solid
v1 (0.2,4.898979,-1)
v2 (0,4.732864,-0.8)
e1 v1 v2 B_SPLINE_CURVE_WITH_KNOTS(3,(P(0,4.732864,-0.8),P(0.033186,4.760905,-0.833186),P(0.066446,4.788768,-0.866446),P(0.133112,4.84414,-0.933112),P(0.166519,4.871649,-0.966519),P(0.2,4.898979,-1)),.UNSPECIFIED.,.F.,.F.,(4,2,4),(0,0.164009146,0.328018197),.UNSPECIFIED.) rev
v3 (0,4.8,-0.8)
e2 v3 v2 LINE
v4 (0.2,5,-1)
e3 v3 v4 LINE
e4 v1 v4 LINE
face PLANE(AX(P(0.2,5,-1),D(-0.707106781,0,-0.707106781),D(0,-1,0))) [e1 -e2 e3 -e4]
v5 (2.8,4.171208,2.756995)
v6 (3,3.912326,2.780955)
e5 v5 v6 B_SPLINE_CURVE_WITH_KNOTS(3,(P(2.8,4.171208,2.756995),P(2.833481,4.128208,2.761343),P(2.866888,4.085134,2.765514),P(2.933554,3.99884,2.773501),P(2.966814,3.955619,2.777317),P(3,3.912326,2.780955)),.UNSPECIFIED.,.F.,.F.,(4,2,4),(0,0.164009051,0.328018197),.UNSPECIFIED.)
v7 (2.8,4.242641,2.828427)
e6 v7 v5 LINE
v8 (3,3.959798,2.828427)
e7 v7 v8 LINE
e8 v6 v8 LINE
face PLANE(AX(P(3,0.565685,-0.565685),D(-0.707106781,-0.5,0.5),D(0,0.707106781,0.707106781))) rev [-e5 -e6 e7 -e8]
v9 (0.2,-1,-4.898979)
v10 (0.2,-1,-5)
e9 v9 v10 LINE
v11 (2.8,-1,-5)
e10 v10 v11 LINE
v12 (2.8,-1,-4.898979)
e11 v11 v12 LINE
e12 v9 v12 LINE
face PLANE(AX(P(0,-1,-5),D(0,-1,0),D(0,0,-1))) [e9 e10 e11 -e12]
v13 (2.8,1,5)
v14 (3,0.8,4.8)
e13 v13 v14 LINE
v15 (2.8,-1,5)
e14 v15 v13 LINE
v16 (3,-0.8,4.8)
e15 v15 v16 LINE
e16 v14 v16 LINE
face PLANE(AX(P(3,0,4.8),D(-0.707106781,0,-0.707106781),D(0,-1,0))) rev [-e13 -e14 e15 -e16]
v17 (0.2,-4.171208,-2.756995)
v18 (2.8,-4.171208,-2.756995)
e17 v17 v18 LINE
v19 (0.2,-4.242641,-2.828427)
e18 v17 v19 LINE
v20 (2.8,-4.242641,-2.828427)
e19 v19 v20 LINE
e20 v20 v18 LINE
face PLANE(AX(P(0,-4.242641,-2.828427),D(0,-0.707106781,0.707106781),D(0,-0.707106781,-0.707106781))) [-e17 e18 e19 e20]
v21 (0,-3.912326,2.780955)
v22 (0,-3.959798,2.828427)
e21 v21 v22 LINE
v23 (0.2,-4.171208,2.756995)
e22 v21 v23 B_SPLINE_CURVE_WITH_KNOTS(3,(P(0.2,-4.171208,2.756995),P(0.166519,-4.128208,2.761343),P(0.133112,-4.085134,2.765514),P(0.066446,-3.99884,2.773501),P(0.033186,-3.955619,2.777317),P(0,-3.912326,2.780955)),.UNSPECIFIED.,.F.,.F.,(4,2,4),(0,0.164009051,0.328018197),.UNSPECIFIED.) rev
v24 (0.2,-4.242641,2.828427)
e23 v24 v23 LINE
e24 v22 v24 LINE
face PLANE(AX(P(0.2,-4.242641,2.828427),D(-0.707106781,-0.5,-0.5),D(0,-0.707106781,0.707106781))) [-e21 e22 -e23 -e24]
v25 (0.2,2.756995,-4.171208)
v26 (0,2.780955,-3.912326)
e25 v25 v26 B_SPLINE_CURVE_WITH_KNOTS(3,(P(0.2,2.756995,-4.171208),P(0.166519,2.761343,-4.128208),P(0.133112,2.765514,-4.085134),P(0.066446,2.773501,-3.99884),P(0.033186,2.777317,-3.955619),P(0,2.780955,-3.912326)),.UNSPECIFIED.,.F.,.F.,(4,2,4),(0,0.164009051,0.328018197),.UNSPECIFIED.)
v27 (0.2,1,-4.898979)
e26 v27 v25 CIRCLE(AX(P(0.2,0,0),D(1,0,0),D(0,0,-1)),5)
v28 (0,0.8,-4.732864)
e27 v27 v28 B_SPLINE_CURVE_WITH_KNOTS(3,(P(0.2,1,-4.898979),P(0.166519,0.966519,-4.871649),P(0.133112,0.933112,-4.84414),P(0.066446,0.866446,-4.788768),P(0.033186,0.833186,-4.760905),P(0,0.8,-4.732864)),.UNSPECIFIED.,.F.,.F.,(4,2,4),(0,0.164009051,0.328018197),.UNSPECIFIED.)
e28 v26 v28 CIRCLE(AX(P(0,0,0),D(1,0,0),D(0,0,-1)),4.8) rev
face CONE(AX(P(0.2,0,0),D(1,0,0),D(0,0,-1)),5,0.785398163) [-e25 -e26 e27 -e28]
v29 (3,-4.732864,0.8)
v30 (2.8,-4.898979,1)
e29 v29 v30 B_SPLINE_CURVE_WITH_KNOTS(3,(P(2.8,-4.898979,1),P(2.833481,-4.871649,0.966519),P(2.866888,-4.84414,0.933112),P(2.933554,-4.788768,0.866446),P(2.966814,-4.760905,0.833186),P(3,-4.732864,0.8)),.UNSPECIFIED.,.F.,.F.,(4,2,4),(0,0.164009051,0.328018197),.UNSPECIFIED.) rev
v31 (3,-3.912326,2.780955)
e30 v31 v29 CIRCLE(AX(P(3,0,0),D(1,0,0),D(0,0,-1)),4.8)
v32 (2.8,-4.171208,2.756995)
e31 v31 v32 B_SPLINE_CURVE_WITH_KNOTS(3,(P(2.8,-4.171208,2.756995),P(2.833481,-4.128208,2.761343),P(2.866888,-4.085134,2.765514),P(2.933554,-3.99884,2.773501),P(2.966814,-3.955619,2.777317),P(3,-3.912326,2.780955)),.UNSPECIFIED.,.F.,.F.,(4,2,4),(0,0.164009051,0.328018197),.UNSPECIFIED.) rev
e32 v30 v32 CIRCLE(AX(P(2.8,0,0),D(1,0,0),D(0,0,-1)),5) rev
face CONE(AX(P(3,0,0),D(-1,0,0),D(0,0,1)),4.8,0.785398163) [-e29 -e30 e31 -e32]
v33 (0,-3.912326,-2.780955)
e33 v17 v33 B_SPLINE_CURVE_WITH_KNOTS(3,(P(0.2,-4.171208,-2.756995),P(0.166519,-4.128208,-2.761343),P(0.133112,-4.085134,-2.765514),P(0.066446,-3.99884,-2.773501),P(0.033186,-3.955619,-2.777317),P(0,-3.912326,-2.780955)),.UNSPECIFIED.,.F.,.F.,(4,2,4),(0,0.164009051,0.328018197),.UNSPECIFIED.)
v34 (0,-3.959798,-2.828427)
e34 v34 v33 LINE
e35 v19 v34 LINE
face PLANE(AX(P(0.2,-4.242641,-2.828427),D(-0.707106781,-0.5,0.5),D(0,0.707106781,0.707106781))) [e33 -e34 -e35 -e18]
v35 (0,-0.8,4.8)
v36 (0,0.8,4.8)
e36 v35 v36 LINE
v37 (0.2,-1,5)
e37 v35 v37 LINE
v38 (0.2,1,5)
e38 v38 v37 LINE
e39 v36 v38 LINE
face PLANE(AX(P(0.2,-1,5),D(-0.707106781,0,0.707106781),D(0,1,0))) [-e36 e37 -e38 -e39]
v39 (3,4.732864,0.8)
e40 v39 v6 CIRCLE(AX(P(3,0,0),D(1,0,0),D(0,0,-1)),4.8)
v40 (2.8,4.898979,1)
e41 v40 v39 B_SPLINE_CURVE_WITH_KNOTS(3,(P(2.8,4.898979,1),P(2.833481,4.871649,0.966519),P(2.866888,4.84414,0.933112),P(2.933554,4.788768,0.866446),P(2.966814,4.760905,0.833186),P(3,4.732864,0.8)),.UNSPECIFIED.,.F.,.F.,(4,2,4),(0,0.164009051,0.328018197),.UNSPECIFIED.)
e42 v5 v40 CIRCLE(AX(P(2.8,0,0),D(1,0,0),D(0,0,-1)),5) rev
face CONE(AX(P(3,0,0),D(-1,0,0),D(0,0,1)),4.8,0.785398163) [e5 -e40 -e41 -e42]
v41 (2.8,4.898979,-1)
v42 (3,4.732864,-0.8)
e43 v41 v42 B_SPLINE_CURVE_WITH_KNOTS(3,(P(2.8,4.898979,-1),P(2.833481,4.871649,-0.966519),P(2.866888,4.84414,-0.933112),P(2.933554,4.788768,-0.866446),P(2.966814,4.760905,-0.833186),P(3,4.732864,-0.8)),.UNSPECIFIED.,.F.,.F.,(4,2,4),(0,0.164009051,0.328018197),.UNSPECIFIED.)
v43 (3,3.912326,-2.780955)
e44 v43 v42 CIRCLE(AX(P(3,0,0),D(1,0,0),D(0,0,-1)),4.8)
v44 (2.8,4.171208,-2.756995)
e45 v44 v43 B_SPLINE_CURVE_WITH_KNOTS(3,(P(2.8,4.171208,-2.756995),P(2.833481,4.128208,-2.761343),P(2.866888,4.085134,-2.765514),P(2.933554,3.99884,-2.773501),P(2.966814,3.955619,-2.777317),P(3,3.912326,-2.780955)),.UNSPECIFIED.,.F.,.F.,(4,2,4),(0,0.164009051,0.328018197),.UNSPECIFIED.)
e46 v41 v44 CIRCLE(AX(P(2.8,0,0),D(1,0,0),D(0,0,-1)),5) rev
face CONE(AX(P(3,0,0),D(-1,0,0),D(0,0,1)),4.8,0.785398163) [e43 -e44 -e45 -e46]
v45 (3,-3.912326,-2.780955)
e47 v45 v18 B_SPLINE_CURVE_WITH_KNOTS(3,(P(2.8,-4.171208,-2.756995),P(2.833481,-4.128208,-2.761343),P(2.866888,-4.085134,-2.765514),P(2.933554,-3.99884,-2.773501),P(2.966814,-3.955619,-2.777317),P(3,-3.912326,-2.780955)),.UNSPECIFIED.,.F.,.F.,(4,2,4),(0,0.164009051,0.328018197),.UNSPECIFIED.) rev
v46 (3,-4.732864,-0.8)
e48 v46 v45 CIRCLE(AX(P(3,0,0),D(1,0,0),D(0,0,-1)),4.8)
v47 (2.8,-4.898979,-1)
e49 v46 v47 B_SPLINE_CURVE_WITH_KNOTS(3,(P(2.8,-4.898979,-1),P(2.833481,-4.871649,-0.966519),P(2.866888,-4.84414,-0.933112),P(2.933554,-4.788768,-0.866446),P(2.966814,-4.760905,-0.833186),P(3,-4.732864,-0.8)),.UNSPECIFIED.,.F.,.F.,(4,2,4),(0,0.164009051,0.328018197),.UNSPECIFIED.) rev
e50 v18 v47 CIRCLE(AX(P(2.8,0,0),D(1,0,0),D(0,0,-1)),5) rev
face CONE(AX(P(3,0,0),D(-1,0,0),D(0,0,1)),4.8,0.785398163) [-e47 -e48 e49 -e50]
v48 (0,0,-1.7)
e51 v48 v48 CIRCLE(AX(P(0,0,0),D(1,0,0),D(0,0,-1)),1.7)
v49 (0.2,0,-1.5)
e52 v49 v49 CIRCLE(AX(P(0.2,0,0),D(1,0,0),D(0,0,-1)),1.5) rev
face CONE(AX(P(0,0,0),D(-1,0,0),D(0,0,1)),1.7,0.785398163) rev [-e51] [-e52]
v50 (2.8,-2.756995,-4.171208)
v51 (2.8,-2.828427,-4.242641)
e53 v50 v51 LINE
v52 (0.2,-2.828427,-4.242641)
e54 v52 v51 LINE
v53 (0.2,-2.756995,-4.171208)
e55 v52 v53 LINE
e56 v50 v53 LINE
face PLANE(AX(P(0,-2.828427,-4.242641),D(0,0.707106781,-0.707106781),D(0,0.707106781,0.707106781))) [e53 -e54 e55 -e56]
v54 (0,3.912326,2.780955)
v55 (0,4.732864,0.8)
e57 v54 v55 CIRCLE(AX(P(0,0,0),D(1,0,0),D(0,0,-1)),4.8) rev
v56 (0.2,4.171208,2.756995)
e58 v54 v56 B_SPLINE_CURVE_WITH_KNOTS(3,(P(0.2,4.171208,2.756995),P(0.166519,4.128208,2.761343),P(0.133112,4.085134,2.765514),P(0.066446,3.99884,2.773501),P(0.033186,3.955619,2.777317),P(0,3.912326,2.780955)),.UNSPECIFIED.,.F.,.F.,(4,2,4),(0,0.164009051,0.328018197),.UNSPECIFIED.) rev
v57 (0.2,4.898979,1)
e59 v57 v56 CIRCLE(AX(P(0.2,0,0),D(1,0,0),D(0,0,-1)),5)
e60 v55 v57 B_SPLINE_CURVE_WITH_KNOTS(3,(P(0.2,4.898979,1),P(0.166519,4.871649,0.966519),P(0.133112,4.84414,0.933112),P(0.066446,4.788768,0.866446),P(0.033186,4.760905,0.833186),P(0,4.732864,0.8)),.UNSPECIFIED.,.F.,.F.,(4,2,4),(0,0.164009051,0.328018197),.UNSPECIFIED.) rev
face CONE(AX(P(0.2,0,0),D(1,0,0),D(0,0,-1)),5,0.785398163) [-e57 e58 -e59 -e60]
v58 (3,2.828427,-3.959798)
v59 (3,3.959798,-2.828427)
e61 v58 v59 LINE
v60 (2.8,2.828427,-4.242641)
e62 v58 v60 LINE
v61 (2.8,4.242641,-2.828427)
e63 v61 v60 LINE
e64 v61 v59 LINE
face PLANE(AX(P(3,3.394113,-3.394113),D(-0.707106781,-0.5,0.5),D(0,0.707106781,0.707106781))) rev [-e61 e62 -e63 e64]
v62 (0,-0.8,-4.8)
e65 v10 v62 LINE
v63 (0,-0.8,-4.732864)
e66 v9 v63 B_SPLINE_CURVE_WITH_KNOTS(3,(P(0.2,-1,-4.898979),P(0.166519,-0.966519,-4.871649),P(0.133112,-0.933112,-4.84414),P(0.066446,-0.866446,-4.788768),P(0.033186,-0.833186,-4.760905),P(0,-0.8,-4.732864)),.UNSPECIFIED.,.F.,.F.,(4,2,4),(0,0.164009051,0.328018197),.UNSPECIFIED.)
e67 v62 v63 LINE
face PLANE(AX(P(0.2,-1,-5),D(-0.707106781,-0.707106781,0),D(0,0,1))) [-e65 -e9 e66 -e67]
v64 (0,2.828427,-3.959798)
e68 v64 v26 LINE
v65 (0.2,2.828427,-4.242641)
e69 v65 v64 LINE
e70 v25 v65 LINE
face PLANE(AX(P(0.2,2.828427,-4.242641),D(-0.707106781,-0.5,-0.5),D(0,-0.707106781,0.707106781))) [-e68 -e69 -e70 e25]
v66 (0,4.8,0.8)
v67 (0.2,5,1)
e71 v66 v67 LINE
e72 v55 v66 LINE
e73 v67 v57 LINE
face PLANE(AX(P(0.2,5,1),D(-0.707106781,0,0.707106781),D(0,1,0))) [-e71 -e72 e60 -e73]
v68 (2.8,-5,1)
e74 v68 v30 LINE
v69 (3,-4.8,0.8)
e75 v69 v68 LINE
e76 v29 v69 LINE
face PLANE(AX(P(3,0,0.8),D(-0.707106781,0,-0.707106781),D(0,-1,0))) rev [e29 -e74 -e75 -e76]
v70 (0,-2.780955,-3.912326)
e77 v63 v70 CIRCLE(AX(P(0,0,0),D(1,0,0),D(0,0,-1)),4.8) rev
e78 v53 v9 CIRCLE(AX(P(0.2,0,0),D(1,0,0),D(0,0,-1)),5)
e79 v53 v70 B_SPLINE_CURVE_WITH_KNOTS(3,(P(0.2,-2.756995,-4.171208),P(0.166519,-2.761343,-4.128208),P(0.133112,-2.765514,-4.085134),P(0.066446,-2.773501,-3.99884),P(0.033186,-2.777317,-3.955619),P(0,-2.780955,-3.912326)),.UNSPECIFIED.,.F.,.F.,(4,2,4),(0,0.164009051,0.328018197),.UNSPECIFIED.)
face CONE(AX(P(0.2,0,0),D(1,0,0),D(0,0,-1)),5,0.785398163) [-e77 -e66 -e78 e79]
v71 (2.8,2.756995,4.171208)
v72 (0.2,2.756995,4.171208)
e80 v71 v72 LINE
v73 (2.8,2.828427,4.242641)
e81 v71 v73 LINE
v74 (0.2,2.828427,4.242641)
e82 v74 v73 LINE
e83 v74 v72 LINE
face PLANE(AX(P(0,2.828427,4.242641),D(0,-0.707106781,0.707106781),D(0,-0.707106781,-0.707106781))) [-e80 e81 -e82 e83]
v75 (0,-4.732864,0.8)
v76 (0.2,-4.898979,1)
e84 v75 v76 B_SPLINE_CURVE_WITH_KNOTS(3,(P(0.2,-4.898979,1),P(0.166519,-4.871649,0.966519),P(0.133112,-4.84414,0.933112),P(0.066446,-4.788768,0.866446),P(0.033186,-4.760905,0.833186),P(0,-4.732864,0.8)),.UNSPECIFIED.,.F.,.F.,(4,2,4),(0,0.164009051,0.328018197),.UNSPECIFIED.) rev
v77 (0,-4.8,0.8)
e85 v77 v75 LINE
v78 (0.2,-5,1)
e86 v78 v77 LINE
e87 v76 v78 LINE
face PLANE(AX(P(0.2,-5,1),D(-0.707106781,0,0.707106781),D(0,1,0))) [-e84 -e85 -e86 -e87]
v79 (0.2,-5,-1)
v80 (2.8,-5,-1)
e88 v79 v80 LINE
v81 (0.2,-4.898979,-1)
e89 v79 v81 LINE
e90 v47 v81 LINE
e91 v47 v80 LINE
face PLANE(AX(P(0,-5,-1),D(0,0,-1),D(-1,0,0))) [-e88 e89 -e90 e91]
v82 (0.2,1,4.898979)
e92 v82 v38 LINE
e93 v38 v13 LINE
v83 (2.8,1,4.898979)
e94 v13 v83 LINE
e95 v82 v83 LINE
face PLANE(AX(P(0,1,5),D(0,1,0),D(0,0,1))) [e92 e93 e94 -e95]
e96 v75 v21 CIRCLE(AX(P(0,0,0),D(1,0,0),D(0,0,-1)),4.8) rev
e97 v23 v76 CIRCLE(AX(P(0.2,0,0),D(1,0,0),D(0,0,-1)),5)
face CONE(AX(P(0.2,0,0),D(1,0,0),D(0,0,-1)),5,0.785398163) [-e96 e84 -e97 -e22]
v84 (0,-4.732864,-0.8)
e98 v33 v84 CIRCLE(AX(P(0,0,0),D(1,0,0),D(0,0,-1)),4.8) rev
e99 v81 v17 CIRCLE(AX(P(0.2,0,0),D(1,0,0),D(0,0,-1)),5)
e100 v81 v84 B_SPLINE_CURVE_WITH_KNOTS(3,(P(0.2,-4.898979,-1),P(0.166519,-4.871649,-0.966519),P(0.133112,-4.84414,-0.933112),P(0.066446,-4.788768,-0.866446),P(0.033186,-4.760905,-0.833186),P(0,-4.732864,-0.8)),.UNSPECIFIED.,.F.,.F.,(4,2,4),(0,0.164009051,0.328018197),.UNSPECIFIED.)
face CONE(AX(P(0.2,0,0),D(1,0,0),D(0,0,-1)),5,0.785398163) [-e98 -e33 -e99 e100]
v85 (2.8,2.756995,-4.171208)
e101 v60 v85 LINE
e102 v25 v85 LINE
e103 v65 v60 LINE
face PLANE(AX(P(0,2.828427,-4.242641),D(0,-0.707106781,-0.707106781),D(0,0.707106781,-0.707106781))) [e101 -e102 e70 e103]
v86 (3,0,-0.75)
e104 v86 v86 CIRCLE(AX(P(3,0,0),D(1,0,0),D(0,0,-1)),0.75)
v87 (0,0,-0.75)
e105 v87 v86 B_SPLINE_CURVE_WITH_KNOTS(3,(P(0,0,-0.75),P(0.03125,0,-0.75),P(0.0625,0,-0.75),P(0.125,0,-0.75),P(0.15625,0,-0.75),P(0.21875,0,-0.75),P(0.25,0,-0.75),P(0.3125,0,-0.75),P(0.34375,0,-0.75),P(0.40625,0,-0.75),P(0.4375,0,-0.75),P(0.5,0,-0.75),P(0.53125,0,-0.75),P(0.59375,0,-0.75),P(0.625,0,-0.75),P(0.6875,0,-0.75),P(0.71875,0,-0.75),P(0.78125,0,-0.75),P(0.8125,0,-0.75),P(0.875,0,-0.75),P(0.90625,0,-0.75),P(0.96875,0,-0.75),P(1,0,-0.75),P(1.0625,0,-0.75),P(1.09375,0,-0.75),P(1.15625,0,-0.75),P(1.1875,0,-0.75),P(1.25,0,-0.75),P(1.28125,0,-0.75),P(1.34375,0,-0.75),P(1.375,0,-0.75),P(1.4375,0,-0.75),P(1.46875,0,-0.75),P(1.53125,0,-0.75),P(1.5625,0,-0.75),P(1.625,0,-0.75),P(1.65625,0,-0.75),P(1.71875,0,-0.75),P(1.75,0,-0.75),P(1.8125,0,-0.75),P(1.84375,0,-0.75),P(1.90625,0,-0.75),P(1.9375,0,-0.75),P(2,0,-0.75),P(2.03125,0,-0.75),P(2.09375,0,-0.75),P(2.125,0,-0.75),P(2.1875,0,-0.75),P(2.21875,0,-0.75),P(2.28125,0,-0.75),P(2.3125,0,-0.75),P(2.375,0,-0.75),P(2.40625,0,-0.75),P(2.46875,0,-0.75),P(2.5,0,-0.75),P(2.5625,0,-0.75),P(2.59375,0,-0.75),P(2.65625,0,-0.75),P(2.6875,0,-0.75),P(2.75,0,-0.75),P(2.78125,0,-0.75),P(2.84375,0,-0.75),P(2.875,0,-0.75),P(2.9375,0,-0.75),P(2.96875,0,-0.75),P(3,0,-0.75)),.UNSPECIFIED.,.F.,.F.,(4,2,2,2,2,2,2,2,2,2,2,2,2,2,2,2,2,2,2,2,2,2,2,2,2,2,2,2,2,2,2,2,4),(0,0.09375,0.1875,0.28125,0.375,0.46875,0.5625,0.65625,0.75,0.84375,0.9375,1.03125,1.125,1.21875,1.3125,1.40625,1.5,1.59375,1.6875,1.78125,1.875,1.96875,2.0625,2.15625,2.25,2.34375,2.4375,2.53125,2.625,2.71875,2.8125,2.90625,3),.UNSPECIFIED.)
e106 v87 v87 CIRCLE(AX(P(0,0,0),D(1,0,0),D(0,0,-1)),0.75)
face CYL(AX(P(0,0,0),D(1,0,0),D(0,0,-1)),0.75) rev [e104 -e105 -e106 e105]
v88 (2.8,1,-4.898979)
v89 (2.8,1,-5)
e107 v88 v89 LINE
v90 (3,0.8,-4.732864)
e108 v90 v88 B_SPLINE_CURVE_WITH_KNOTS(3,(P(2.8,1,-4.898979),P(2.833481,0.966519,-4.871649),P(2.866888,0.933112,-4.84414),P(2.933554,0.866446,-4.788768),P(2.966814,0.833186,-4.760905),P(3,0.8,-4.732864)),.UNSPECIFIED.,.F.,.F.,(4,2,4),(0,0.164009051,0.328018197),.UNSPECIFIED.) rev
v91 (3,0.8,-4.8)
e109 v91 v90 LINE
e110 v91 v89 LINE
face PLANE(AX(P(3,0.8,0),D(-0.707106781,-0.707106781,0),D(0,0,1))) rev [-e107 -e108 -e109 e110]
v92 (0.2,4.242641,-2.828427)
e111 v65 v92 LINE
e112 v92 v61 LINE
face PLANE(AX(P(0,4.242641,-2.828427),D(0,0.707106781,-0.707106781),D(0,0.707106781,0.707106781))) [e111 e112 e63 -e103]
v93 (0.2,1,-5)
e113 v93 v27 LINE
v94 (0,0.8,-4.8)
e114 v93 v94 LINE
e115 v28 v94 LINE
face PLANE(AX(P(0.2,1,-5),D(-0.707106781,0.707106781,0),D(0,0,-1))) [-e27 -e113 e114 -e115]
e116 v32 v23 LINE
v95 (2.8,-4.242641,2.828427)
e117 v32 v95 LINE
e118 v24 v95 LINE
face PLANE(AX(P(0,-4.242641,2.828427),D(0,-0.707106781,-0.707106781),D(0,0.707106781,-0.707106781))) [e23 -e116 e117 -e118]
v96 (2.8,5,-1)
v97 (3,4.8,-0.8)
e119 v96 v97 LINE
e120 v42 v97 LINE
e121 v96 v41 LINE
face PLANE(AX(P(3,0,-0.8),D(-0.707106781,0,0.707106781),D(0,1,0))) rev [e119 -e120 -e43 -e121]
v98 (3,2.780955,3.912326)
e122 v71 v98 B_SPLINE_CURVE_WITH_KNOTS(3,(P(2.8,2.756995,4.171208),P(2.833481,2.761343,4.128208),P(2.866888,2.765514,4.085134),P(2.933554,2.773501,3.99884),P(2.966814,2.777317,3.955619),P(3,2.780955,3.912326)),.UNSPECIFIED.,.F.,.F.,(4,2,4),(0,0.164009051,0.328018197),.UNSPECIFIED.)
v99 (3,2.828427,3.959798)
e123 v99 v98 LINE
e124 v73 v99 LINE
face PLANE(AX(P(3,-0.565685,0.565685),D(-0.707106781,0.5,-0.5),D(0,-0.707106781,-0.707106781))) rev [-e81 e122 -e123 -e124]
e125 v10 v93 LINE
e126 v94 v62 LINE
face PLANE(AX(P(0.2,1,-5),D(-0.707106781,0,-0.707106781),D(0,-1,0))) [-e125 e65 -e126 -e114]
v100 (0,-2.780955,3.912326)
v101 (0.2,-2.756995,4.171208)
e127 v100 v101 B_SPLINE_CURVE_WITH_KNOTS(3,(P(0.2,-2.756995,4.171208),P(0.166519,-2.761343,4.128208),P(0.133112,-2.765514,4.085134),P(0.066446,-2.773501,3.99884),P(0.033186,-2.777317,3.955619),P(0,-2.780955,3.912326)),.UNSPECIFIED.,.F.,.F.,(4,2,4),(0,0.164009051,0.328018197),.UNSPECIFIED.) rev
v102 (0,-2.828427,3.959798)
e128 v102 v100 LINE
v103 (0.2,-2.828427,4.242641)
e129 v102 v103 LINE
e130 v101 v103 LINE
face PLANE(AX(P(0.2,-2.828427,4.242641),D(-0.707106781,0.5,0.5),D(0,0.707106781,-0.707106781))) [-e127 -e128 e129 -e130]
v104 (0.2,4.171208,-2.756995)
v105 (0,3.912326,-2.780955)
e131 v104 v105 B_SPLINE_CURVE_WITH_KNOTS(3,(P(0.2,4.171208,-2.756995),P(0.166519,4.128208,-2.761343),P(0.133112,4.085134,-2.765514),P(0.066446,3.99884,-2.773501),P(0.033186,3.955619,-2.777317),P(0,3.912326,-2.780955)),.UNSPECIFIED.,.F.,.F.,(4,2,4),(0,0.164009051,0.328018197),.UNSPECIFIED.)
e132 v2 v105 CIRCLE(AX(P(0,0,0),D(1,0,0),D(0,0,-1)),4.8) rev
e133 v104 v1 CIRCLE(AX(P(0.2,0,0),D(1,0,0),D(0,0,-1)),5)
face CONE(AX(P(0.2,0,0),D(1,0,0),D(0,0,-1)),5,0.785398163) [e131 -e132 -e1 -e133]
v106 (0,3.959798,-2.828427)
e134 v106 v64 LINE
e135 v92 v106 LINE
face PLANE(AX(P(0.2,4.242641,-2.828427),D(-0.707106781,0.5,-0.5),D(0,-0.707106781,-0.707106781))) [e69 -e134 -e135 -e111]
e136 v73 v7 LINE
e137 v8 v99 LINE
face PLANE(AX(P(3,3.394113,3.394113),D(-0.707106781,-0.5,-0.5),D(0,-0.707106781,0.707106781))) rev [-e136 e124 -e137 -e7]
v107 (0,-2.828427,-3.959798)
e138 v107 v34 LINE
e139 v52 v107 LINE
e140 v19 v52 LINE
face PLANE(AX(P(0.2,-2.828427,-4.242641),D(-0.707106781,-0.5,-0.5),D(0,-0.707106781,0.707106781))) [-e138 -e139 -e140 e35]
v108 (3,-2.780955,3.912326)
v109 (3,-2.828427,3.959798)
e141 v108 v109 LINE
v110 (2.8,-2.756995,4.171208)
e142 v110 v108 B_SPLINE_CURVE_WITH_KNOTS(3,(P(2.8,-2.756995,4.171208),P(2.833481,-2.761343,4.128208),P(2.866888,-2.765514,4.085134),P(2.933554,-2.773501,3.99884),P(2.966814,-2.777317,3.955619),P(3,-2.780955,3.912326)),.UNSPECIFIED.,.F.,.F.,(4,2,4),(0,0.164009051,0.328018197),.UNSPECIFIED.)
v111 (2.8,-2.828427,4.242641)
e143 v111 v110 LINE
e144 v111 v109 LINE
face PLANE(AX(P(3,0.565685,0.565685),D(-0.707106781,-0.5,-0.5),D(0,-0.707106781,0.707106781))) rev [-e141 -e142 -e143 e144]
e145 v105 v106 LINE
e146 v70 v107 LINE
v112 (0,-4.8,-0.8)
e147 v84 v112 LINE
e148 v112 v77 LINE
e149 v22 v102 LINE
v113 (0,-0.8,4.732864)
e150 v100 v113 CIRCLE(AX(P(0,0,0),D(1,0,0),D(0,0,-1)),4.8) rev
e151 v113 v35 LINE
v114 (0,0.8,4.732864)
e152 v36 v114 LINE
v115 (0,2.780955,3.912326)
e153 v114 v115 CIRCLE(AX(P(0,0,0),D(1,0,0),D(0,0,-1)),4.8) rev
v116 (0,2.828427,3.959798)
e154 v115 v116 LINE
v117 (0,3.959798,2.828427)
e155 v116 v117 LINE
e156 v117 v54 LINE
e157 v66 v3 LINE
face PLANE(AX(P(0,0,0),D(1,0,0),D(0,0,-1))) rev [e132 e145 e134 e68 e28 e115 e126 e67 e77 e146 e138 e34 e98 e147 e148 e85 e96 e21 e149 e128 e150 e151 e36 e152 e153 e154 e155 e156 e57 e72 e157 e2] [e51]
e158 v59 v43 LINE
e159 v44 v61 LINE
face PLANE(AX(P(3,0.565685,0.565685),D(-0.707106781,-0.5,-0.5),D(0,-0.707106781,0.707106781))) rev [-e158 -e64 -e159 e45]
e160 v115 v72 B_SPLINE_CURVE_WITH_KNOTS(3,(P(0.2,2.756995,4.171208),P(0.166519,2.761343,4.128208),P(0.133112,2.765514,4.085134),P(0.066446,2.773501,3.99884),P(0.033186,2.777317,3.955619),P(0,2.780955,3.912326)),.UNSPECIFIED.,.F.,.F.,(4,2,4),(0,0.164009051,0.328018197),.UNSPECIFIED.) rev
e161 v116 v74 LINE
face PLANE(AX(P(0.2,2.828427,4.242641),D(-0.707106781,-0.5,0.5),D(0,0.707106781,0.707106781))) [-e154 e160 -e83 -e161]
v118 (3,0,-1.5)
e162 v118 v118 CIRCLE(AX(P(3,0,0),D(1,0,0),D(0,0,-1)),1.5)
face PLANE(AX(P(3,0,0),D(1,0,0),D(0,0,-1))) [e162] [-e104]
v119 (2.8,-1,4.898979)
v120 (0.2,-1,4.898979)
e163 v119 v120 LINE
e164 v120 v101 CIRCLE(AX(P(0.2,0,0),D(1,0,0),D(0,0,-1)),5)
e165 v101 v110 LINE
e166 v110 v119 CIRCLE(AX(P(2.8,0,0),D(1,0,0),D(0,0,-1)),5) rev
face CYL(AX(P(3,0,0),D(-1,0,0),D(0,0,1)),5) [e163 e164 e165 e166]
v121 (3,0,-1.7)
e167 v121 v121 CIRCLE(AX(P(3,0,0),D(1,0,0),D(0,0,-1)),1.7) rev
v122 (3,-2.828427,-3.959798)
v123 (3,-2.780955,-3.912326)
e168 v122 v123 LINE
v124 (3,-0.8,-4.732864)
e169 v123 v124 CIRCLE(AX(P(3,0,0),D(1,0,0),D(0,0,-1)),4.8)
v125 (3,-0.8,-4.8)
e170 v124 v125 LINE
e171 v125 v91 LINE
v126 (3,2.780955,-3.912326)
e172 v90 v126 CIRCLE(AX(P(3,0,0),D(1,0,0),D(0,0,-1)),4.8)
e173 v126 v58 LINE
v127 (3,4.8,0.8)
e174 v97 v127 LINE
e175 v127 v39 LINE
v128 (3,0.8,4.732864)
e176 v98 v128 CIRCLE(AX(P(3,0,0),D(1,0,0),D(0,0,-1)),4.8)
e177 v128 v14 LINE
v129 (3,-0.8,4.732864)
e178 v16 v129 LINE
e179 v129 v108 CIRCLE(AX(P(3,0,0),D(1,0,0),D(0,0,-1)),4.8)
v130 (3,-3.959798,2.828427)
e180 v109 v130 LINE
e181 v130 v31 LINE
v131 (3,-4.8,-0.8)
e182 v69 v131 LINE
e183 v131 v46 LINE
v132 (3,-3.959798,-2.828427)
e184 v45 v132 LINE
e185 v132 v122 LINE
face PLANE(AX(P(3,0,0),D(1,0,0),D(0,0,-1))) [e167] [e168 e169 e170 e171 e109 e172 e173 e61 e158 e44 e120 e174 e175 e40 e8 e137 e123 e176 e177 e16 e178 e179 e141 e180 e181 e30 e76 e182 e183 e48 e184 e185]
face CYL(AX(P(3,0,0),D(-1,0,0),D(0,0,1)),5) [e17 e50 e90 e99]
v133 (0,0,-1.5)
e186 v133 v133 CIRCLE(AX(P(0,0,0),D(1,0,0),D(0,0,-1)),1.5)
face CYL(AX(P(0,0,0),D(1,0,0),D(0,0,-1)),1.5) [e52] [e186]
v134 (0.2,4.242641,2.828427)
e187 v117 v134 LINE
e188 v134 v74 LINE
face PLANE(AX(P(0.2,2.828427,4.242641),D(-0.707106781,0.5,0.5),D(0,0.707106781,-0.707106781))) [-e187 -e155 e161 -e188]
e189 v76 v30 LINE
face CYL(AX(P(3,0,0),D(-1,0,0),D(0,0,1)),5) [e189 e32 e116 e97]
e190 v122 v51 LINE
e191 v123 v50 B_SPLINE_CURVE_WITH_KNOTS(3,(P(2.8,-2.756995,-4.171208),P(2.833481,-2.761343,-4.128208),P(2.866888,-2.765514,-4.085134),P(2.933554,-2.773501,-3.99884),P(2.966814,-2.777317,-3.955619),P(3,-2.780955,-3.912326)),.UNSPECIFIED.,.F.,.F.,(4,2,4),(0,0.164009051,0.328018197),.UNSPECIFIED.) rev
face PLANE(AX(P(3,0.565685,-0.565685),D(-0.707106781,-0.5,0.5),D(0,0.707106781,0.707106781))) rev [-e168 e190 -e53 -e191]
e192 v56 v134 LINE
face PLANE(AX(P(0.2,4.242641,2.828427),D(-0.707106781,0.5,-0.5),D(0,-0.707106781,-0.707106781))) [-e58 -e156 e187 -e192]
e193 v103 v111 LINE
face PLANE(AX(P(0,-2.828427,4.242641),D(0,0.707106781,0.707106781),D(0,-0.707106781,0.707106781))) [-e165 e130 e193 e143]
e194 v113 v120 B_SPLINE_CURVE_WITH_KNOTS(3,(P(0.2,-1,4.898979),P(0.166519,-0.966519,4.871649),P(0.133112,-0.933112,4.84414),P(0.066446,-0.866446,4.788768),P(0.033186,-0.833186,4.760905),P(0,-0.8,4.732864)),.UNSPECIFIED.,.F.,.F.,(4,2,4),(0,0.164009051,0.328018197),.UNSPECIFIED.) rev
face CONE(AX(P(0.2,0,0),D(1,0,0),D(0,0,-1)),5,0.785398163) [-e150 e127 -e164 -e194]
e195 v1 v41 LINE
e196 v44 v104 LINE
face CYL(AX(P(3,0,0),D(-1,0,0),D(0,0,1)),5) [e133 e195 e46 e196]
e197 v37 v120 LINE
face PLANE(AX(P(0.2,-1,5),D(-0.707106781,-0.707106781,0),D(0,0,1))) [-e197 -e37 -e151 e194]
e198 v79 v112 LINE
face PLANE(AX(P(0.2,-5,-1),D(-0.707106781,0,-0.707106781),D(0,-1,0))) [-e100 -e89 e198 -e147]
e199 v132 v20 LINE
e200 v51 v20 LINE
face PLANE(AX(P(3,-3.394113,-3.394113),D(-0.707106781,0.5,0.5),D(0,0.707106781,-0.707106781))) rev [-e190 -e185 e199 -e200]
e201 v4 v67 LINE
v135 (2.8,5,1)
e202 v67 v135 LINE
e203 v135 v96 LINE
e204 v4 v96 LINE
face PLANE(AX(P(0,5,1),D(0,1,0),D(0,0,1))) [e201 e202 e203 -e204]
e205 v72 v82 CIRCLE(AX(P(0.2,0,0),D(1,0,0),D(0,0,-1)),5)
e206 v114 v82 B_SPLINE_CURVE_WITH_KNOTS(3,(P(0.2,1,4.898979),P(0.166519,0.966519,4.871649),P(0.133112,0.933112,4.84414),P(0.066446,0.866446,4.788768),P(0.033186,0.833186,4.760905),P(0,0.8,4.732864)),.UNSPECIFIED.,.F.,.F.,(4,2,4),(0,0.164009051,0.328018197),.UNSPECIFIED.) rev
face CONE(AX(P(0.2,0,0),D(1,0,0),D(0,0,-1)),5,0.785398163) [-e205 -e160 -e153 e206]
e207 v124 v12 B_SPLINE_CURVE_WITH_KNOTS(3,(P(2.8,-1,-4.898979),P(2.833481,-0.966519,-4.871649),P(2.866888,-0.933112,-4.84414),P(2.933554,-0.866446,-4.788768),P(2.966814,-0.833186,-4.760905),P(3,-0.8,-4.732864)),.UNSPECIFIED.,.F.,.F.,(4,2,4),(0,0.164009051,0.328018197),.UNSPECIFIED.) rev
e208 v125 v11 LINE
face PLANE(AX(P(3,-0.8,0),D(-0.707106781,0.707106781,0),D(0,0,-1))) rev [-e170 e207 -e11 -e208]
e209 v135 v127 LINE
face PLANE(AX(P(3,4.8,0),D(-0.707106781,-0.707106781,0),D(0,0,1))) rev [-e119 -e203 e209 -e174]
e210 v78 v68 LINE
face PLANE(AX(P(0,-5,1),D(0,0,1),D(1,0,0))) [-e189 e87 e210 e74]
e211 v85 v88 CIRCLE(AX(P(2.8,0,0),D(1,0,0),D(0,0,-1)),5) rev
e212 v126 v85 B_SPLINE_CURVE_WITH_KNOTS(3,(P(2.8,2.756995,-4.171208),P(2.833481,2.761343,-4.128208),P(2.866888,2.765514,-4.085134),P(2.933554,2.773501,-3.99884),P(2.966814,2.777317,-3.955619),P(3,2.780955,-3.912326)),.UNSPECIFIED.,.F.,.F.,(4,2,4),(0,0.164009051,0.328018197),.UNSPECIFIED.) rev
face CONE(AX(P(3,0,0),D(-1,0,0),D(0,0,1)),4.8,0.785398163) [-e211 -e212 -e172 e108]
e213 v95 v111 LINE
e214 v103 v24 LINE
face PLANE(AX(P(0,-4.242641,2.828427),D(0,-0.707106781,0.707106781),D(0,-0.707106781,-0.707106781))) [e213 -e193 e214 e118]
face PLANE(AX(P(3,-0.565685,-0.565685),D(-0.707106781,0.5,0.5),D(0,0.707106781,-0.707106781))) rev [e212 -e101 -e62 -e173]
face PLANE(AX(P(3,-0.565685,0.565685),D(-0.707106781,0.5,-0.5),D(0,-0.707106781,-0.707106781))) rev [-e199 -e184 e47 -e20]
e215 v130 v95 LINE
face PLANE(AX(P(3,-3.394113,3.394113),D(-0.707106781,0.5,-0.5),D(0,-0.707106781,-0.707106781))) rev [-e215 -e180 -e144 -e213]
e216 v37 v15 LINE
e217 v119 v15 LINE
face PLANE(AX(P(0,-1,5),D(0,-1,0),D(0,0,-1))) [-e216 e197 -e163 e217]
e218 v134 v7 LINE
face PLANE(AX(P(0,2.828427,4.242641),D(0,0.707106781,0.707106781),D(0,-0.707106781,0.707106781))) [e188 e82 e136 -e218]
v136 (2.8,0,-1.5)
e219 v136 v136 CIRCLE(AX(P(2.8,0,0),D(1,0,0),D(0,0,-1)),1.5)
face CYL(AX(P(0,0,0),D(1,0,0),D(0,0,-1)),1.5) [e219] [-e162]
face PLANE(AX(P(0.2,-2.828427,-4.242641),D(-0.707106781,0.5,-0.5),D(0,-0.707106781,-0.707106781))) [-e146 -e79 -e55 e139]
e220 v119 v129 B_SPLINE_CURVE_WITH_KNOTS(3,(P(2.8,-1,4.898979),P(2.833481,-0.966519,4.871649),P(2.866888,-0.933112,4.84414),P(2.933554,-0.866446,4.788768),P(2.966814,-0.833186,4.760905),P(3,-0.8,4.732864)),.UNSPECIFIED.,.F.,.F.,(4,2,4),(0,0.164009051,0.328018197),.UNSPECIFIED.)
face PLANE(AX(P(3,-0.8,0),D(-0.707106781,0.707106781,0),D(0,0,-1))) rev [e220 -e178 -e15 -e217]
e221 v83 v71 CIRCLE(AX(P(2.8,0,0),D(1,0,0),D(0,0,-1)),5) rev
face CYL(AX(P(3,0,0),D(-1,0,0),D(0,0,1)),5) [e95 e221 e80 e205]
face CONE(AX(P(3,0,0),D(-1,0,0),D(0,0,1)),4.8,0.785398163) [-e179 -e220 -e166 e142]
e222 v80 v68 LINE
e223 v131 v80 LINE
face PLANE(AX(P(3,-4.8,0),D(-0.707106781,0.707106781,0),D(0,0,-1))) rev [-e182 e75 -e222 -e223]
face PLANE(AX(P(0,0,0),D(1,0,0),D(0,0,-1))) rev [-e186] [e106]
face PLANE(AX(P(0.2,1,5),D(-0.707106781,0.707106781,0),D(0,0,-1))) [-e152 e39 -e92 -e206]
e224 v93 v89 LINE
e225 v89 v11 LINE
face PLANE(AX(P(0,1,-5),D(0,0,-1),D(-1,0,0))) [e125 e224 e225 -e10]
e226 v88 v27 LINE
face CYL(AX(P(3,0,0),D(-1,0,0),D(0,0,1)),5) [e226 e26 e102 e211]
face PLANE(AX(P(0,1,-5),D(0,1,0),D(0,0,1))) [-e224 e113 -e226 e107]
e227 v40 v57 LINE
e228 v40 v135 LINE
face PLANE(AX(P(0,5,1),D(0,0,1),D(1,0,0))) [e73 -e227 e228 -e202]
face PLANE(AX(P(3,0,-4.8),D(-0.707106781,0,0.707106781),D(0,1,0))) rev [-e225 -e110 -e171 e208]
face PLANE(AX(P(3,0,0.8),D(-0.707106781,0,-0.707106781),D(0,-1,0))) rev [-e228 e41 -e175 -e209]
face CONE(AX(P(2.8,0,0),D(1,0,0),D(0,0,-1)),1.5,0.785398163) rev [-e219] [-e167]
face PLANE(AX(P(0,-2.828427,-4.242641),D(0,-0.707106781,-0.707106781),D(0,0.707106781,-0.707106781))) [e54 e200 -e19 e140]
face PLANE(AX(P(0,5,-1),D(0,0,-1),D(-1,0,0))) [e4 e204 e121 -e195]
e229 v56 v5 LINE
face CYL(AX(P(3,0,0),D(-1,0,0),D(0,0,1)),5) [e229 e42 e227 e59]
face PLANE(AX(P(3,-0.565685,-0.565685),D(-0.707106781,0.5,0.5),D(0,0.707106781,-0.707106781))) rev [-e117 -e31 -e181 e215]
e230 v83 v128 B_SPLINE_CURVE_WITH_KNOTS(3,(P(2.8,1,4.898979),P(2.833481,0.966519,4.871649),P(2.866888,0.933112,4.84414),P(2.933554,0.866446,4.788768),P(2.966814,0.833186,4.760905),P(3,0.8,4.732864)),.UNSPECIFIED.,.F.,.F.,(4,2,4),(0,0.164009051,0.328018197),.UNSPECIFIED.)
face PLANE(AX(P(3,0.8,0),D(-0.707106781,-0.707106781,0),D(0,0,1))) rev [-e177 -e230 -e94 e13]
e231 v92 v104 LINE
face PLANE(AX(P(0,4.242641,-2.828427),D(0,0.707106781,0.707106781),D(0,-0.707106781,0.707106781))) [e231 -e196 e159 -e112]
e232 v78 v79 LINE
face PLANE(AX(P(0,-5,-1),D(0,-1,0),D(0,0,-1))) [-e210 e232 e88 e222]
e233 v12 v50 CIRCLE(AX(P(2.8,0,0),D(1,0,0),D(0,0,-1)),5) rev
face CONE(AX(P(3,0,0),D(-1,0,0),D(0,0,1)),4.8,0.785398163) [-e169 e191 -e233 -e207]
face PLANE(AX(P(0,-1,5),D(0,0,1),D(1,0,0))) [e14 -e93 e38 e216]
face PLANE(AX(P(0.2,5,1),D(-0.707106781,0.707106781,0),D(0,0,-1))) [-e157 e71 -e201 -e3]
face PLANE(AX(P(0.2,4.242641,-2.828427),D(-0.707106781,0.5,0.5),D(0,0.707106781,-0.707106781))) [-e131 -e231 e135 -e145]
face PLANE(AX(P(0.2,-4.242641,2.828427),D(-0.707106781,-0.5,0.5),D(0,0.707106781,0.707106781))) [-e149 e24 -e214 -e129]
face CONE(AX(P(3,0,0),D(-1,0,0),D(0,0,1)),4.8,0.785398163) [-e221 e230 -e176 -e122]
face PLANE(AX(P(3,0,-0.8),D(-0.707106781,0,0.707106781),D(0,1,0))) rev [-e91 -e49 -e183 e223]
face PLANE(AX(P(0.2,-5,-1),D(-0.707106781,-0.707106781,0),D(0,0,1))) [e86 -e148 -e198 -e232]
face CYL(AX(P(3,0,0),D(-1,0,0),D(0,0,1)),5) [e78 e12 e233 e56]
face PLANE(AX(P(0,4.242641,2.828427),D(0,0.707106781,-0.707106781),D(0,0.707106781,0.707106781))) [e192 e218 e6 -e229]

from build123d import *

# Parameters (mm, degrees)
SKETCH1_R                 = 5
SKETCH1_R_2               = 1.5
BOSS_EXTRUDE1_DEPTH       = 3
SKETCH2_W                 = 0.580440463
SKETCH2_H                 = 2
SKETCH2_W_2               = 2
SKETCH2_H_2               = 0.580440463
BOSS_EXTRUDE2_DEPTH       = 3
CHAMFER3_SIZE             = 0.2
CHAMFER4_SIZE             = 0.2
BOSS_EXTRUDE3_OUTLINE_R   = 1.5
BOSS_EXTRUDE3_OUTLINE_R_2 = 0.75
BOSS_EXTRUDE3_DEPTH       = 3


# Read off the part's stored shape, not the designer's step: Boss-Extrude3
with BuildPart() as part:
    # Sketch1 → Boss-Extrude1 (new body)
    with BuildSketch(Plane(origin=(0, 0, 0), x_dir=(0, 0, -1), z_dir=(1, 0, 0))):
        Circle(SKETCH1_R)
        Circle(SKETCH1_R_2, mode=Mode.SUBTRACT)
    extrude(amount=BOSS_EXTRUDE1_DEPTH)

    # Sketch2 → Boss-Extrude2 (add)
    with BuildSketch(Plane(origin=(3, 0, 0), x_dir=(0, 0, -1), z_dir=(1, 0, 0))):
        with Locations((4.709779769, 0)):
            Rectangle(SKETCH2_W, SKETCH2_H)
        Polygon((4.242640687, -2.828427125), (2.828427125, -4.242640687), (2.417993737, -3.8322073), (3.8322073, -2.417993737), align=None)
        with Locations((0, -4.709779769)):
            Rectangle(SKETCH2_W_2, SKETCH2_H_2)
        Polygon((-2.828427125, -4.242640687), (-4.242640687, -2.828427125), (-3.8322073, -2.417993737), (-2.417993737, -3.8322073), align=None)
        with Locations((-4.709779769, 0)):
            Rectangle(SKETCH2_W, SKETCH2_H)
        Polygon((-4.242640687, 2.828427125), (-2.828427125, 4.242640687), (-2.417993737, 3.8322073), (-3.8322073, 2.417993737), align=None)
        with Locations((0, 4.709779769)):
            Rectangle(SKETCH2_W_2, SKETCH2_H_2)
        Polygon((2.828427125, 4.242640687), (4.242640687, 2.828427125), (3.8322073, 2.417993737), (2.417993737, 3.8322073), align=None)
    extrude(amount=-BOSS_EXTRUDE2_DEPTH)

    # Chamfer3
    chamfer3_edges = [part.edges().sort_by_distance(p)[0] for p in [
        (3, 0, 5),
        (3, 1, 4.949489743),
        (3, -1, 4.949489743),
        (3, 1.913417162, 4.619397663),
        (3, 2.792710979, 4.206924542),
        (3, 3.535533906, 3.535533906),
        (3, 4.206924542, 2.792710979),
        (3, 4.619397663, 1.913417162),
        (3, 4.949489743, 1),
        (3, 5, 0),
        (3, 4.949489743, -1),
        (3, 4.619397663, -1.913417162),
        (3, 1, -4.949489743),
        (3, 0, -5),
        (3, 4.206924542, -2.792710979),
        (3, 3.535533906, -3.535533906),
        (3, 2.792710979, -4.206924542),
        (3, -1, -4.949489743),
        (3, -1.913417162, -4.619397663),
        (3, -2.792710979, -4.206924542),
        (3, -3.535533906, -3.535533906),
        (3, -4.206924542, -2.792710979),
        (3, 0, 1.5),
        (3, -4.619397663, -1.913417162),
        (3, -4.949489743, -1),
        (3, -5, 0),
        (3, -4.949489743, 1),
        (3, -4.619397663, 1.913417162),
        (3, -4.206924542, 2.792710979),
        (3, -3.535533906, 3.535533906),
        (3, -2.792710979, 4.206924542),
        (3, 1.913417162, -4.619397663),
        (3, -1.913417162, 4.619397663),
    ]]
    chamfer(chamfer3_edges, length=CHAMFER3_SIZE)

    # Chamfer4
    chamfer4_edges = [part.edges().sort_by_distance(p)[0] for p in [
        (0, -1, 4.949489743),
        (0, 0, 5),
        (0, 1, 4.949489743),
        (0, 1.913417162, -4.619397663),
        (0, 1.913417162, 4.619397663),
        (0, 2.792710979, 4.206924542),
        (0, 3.535533906, 3.535533906),
        (0, 4.206924542, 2.792710979),
        (0, 4.619397663, 1.913417162),
        (0, 1, -4.949489743),
        (0, 4.949489743, 1),
        (0, 5, 0),
        (0, 4.949489743, -1),
        (0, 0, -5),
        (0, -1, -4.949489743),
        (0, 4.619397663, -1.913417162),
        (0, 4.206924542, -2.792710979),
        (0, 3.535533906, -3.535533906),
        (0, 2.792710979, -4.206924542),
        (0, -1.913417162, -4.619397663),
        (0, -2.792710979, -4.206924542),
        (0, -3.535533906, -3.535533906),
        (0, -4.206924542, -2.792710979),
        (0, 0, 1.5),
        (0, -4.619397663, -1.913417162),
        (0, -4.949489743, -1),
        (0, -5, 0),
        (0, -4.949489743, 1),
        (0, -4.619397663, 1.913417162),
        (0, -4.206924542, 2.792710979),
        (0, -3.535533906, 3.535533906),
        (0, -2.792710979, 4.206924542),
        (0, -1.913417162, 4.619397663),
    ]]
    chamfer(chamfer4_edges, length=CHAMFER4_SIZE)

    # Boss-Extrude3 outline → Boss-Extrude3 (add)
    with BuildSketch(Plane.YZ):
        Circle(BOSS_EXTRUDE3_OUTLINE_R)
        Circle(BOSS_EXTRUDE3_OUTLINE_R_2, mode=Mode.SUBTRACT)
    extrude(amount=BOSS_EXTRUDE3_DEPTH)


solid = part.part
